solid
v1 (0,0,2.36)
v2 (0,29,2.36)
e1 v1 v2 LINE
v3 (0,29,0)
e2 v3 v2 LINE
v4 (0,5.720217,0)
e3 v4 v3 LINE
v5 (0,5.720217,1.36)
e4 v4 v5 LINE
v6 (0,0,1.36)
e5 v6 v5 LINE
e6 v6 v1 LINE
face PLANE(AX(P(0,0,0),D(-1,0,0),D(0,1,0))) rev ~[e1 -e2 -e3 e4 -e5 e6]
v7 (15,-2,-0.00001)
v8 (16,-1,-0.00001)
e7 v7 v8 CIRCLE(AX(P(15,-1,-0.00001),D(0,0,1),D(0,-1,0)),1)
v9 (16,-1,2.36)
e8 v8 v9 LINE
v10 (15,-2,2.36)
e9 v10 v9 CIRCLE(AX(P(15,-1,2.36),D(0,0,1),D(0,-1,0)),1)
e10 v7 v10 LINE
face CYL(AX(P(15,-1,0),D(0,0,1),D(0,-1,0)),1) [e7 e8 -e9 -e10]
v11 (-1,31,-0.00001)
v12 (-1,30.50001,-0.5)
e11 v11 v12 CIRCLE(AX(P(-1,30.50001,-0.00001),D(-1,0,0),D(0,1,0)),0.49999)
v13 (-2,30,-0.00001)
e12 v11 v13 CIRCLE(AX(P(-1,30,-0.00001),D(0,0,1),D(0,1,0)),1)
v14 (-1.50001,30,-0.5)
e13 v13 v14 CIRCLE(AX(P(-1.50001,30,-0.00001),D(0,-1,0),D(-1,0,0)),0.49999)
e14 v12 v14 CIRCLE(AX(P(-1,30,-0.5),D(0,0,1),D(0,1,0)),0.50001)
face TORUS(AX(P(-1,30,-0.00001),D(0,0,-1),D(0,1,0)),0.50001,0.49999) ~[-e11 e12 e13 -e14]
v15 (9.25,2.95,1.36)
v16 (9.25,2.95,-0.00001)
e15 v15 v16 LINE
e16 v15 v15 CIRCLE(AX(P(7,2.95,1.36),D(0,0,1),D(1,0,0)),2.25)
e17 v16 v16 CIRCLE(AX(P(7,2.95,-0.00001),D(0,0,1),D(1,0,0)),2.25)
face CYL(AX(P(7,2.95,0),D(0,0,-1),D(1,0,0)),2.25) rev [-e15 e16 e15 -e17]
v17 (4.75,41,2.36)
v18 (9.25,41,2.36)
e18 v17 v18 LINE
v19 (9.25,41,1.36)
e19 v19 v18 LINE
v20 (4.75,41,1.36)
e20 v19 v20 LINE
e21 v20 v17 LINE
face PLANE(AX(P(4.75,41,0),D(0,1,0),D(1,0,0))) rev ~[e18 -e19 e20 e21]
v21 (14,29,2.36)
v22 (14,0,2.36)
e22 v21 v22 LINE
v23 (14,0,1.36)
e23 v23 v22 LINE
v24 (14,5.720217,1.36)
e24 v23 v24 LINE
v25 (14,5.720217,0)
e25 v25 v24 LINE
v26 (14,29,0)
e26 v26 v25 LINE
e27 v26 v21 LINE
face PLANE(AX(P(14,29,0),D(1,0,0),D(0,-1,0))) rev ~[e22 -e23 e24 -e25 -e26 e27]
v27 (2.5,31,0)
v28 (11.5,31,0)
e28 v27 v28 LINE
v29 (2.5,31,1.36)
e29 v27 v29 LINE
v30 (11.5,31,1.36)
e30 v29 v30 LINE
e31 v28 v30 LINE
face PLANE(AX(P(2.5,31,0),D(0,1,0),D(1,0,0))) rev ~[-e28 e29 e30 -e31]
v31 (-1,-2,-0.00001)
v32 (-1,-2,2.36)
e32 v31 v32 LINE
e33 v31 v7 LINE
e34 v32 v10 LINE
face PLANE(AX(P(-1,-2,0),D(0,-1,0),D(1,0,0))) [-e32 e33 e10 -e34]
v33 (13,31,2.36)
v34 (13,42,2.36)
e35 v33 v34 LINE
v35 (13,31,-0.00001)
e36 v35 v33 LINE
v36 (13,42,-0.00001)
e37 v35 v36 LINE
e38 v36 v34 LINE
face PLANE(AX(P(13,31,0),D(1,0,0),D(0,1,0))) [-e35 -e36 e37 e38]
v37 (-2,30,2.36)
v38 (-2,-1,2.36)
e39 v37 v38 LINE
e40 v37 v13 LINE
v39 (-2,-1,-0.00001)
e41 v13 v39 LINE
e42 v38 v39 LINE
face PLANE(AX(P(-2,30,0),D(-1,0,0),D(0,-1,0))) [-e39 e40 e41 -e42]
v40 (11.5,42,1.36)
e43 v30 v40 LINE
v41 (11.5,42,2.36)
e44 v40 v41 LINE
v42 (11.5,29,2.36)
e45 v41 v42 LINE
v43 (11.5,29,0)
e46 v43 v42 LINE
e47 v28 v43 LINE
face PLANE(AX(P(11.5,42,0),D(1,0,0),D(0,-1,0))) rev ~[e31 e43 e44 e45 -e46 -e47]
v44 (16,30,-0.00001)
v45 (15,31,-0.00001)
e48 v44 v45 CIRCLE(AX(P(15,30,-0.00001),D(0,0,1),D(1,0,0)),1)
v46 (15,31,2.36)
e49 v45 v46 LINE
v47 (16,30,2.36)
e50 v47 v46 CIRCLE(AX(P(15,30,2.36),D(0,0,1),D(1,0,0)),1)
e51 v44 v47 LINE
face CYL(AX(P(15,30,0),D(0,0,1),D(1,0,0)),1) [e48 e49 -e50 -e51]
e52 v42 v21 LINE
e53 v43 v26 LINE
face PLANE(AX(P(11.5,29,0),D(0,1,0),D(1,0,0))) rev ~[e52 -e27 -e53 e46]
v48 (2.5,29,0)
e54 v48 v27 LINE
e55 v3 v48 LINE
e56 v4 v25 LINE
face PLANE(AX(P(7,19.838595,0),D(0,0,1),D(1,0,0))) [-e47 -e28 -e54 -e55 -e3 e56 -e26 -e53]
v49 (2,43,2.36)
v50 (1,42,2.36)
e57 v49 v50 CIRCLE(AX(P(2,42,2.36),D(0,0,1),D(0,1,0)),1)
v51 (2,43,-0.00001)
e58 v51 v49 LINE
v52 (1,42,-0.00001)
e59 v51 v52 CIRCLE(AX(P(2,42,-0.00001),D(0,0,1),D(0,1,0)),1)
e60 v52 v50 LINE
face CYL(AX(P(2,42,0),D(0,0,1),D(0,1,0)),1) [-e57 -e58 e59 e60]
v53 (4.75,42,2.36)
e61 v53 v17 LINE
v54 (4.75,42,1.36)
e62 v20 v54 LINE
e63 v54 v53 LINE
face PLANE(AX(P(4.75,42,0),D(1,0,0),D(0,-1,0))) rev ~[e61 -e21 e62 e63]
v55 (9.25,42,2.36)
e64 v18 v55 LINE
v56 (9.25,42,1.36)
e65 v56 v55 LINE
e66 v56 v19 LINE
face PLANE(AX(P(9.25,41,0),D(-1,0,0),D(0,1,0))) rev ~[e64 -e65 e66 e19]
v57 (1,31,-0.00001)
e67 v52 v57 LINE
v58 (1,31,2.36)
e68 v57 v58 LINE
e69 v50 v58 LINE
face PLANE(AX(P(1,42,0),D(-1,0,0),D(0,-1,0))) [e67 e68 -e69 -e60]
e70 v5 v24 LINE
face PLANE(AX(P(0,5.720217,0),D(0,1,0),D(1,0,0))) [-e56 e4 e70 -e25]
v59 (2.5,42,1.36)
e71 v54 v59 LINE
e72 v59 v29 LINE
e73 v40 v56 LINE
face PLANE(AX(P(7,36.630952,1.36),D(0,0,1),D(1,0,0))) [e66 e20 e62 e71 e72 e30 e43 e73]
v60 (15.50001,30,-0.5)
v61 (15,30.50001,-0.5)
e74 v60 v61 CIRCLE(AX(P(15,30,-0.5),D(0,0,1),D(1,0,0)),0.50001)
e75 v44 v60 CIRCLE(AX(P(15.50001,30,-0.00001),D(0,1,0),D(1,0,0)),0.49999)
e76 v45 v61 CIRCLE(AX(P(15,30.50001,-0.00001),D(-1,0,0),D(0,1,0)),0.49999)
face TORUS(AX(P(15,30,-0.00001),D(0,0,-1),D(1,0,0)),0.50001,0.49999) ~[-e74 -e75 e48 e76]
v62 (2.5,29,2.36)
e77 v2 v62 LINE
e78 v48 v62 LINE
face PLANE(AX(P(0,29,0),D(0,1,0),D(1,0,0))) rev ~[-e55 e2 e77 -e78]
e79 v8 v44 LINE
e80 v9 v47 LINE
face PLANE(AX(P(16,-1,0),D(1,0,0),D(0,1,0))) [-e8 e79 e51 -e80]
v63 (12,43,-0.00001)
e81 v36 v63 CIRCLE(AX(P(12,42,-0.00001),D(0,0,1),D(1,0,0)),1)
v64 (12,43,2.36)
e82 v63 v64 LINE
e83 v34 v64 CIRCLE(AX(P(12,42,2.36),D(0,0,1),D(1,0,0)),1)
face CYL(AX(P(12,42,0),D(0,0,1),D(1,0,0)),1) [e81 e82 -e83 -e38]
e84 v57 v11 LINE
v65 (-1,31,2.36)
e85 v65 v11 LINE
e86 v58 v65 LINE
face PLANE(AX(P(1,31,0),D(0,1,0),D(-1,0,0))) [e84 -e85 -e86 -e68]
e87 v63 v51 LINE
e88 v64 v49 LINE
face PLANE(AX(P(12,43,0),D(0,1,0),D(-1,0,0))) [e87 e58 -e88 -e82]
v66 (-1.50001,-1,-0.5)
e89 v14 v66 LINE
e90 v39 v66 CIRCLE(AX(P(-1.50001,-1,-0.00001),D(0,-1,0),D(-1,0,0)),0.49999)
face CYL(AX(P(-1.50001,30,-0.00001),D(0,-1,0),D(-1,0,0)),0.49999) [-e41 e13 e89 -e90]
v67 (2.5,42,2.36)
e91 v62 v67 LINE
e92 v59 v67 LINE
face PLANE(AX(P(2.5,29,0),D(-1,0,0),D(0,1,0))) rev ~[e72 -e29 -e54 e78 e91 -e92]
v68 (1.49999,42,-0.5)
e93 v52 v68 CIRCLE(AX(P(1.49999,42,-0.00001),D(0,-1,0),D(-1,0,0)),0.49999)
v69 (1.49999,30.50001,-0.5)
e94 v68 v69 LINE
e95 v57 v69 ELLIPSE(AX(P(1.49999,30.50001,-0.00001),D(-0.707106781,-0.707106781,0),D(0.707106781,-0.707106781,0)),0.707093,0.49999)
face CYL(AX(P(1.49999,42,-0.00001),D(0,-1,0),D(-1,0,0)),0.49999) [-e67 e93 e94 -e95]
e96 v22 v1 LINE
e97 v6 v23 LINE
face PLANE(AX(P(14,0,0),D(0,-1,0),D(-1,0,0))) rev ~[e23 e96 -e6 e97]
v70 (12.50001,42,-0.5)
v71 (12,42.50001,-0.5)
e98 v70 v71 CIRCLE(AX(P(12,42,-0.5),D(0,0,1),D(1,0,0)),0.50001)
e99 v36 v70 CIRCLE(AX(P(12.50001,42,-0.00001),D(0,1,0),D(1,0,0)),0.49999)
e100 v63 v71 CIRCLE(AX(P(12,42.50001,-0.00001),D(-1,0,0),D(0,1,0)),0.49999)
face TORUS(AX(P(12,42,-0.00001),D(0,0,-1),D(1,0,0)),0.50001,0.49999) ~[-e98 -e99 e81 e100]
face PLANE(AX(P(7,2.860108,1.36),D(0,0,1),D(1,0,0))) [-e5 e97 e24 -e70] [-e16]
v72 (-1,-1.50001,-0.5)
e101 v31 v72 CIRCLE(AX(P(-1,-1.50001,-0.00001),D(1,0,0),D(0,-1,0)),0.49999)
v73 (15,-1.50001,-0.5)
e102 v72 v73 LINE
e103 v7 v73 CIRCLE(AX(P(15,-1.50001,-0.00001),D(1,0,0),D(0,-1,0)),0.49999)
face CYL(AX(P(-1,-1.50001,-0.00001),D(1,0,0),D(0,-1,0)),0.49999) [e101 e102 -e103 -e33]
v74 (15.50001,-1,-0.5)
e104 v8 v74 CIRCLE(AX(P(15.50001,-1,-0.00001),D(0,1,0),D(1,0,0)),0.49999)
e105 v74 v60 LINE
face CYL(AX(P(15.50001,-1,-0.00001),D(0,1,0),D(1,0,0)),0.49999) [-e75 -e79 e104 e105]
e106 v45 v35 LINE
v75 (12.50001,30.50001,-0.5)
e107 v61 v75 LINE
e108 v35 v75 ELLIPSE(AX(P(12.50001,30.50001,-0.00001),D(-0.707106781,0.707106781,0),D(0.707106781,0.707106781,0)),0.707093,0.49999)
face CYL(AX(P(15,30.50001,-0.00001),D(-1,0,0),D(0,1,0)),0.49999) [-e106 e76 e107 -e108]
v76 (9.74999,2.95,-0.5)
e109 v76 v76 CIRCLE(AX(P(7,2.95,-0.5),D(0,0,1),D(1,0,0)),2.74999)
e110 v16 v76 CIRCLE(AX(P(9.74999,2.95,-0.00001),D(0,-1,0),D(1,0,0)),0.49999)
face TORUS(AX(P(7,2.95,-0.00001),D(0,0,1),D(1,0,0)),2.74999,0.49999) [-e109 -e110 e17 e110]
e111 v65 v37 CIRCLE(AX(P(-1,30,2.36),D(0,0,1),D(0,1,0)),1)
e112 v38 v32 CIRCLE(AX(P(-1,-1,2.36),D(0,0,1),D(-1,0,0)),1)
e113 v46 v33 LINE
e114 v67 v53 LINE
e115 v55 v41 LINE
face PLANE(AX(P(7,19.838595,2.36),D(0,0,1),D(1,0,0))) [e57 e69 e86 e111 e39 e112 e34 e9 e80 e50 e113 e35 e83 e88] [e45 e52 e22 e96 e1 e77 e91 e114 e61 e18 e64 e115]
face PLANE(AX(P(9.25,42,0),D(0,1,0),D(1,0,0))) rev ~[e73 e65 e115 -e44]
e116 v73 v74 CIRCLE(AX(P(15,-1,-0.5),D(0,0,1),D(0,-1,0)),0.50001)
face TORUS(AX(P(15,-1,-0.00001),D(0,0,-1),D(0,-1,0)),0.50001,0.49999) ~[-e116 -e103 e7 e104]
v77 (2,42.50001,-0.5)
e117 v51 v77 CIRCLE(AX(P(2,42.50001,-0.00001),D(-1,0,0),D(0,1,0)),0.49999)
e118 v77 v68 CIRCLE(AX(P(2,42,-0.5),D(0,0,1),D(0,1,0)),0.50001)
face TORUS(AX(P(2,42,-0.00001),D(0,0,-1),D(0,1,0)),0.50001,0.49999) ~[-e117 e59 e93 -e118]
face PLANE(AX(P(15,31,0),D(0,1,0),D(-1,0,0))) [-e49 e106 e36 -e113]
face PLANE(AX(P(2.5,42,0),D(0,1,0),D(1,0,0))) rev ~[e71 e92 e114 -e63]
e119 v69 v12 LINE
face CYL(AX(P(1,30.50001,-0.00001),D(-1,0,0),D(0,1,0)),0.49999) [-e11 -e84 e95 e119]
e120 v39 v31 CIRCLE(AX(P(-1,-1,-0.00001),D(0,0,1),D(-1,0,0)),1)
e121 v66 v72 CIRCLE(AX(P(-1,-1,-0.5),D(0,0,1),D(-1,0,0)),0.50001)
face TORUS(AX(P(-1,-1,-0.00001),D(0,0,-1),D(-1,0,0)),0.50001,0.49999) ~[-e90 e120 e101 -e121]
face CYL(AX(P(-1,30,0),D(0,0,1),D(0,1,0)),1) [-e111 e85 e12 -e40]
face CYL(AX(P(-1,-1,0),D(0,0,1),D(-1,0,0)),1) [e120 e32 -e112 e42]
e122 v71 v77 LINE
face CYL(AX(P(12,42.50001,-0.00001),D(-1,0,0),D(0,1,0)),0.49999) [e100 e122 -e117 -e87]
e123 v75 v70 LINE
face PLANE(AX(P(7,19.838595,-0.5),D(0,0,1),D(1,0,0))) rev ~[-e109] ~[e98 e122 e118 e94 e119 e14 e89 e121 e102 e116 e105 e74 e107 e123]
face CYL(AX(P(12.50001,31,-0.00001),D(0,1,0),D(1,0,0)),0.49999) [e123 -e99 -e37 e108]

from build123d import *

# Parameters (mm, degrees)
F1_DEPTH = 2.36
F0_W     = 14
F0_H     = 5.7202167809
F0_R     = 2.25
F0_R_2   = 4.5
F2_DEPTH = 0.5
F3_R     = 0.49999
F4_DEPTH = 1.36
F5_DEPTH = 1.36


# Not quite as in the source:
# - a fillet or chamfer is up to 0.001 mm smaller than in the source, because OpenCascade refuses the exact size


with BuildPart() as f1:
    # F0 (on Top) → F1 (new body)
    with BuildSketch(Plane.XY):
        with BuildLine():
            ThreePointArc((-2, -1), (-1.7071067812, -1.7071067812), (-1, -2))
            Line((-1, -2), (15, -2))
            ThreePointArc((15, -2), (15.7071067812, -1.7071067812), (16, -1))
            Line((16, -1), (16, 30))
            ThreePointArc((16, 30), (15.7071067812, 30.7071067812), (15, 31))
            Line((15, 31), (13, 31))
            Line((13, 31), (13, 42))
            ThreePointArc((13, 42), (12.7071067812, 42.7071067812), (12, 43))
            Line((12, 43), (2, 43))
            ThreePointArc((2, 43), (1.2928932188, 42.7071067812), (1, 42))
            Line((1, 42), (1, 31))
            Line((1, 31), (-1, 31))
            ThreePointArc((-1, 31), (-1.7071067812, 30.7071067812), (-2, 30))
            Line((-2, 30), (-2, -1))
        make_face()
        Polygon((14, 0), (0, 0), (0, 5.7202167809), (0, 29), (2.5, 29), (2.5, 31), (2.5, 42), (4.75, 42), (4.75, 41), (9.25, 41), (9.25, 42), (11.5, 42), (11.5, 31), (11.5, 29), (14, 29), (14, 5.7202167809), align=None, mode=Mode.SUBTRACT)
    extrude(amount=F1_DEPTH)

    # F0 (on Top) → F2 (join)
    with BuildSketch(Plane.XY):
        with BuildLine():
            ThreePointArc((-2, -1), (-1.7071067812, -1.7071067812), (-1, -2))
            Line((-1, -2), (15, -2))
            ThreePointArc((15, -2), (15.7071067812, -1.7071067812), (16, -1))
            Line((16, -1), (16, 30))
            ThreePointArc((16, 30), (15.7071067812, 30.7071067812), (15, 31))
            Line((15, 31), (13, 31))
            Line((13, 31), (13, 42))
            ThreePointArc((13, 42), (12.7071067812, 42.7071067812), (12, 43))
            Line((12, 43), (2, 43))
            ThreePointArc((2, 43), (1.2928932188, 42.7071067812), (1, 42))
            Line((1, 42), (1, 31))
            Line((1, 31), (-1, 31))
            ThreePointArc((-1, 31), (-1.7071067812, 30.7071067812), (-2, 30))
            Line((-2, 30), (-2, -1))
        make_face()
        Polygon((14, 0), (0, 0), (0, 5.7202167809), (0, 29), (2.5, 29), (2.5, 31), (2.5, 42), (4.75, 42), (4.75, 41), (9.25, 41), (9.25, 42), (11.5, 42), (11.5, 31), (11.5, 29), (14, 29), (14, 5.7202167809), align=None, mode=Mode.SUBTRACT)
        with Locations((7, 2.8601083905)):
            Rectangle(F0_W, F0_H)
        with Locations((7, 2.95)):
            Circle(F0_R, mode=Mode.SUBTRACT)
        Polygon((2.5, 42), (2.5, 31), (11.5, 31), (11.5, 42), (9.25, 42), (9.25, 41), (4.75, 41), (4.75, 42), align=None)
        Polygon((0, 29), (0, 5.7202167809), (14, 5.7202167809), (14, 29), (11.5, 29), (11.5, 31), (2.5, 31), (2.5, 29), align=None)
        with Locations((7, 18.8)):
            Circle(F0_R_2, mode=Mode.SUBTRACT)
        with Locations((7, 18.8)):
            Circle(F0_R_2)
    extrude(amount=-F2_DEPTH)

    # F3 (radius 0.5 in the source; OpenCascade refuses exactly that, so slightly less here)
    f3_edges = [f1.edges().sort_by_distance(p)[0] for p in [
        (1, 36.5, -0.5),
        (0, 31, -0.5),
        (-1.707107, 30.707107, -0.5),
        (-2, 14.5, -0.5),
        (-1.707107, -1.707107, -0.5),
        (7, -2, -0.5),
        (15.707107, -1.707107, -0.5),
        (16, 14.5, -0.5),
        (15.707107, 30.707107, -0.5),
        (14, 31, -0.5),
        (13, 36.5, -0.5),
        (12.707107, 42.707107, -0.5),
        (7, 43, -0.5),
        (1.292893, 42.707107, -0.5),
        (4.75, 2.95, -0.5),
    ]]
    fillet(f3_edges, radius=F3_R)

    # F0 (on Top) → F4 (join)
    with BuildSketch(Plane.XY):
        Polygon((2.5, 42), (2.5, 31), (11.5, 31), (11.5, 42), (9.25, 42), (9.25, 41), (4.75, 41), (4.75, 42), align=None)
    extrude(amount=F4_DEPTH)

    # F0 (on Top) → F5 (join)
    with BuildSketch(Plane.XY):
        with Locations((7, 2.8601083905)):
            Rectangle(F0_W, F0_H)
        with Locations((7, 2.95)):
            Circle(F0_R, mode=Mode.SUBTRACT)
    extrude(amount=F5_DEPTH)


solid = f1.part
